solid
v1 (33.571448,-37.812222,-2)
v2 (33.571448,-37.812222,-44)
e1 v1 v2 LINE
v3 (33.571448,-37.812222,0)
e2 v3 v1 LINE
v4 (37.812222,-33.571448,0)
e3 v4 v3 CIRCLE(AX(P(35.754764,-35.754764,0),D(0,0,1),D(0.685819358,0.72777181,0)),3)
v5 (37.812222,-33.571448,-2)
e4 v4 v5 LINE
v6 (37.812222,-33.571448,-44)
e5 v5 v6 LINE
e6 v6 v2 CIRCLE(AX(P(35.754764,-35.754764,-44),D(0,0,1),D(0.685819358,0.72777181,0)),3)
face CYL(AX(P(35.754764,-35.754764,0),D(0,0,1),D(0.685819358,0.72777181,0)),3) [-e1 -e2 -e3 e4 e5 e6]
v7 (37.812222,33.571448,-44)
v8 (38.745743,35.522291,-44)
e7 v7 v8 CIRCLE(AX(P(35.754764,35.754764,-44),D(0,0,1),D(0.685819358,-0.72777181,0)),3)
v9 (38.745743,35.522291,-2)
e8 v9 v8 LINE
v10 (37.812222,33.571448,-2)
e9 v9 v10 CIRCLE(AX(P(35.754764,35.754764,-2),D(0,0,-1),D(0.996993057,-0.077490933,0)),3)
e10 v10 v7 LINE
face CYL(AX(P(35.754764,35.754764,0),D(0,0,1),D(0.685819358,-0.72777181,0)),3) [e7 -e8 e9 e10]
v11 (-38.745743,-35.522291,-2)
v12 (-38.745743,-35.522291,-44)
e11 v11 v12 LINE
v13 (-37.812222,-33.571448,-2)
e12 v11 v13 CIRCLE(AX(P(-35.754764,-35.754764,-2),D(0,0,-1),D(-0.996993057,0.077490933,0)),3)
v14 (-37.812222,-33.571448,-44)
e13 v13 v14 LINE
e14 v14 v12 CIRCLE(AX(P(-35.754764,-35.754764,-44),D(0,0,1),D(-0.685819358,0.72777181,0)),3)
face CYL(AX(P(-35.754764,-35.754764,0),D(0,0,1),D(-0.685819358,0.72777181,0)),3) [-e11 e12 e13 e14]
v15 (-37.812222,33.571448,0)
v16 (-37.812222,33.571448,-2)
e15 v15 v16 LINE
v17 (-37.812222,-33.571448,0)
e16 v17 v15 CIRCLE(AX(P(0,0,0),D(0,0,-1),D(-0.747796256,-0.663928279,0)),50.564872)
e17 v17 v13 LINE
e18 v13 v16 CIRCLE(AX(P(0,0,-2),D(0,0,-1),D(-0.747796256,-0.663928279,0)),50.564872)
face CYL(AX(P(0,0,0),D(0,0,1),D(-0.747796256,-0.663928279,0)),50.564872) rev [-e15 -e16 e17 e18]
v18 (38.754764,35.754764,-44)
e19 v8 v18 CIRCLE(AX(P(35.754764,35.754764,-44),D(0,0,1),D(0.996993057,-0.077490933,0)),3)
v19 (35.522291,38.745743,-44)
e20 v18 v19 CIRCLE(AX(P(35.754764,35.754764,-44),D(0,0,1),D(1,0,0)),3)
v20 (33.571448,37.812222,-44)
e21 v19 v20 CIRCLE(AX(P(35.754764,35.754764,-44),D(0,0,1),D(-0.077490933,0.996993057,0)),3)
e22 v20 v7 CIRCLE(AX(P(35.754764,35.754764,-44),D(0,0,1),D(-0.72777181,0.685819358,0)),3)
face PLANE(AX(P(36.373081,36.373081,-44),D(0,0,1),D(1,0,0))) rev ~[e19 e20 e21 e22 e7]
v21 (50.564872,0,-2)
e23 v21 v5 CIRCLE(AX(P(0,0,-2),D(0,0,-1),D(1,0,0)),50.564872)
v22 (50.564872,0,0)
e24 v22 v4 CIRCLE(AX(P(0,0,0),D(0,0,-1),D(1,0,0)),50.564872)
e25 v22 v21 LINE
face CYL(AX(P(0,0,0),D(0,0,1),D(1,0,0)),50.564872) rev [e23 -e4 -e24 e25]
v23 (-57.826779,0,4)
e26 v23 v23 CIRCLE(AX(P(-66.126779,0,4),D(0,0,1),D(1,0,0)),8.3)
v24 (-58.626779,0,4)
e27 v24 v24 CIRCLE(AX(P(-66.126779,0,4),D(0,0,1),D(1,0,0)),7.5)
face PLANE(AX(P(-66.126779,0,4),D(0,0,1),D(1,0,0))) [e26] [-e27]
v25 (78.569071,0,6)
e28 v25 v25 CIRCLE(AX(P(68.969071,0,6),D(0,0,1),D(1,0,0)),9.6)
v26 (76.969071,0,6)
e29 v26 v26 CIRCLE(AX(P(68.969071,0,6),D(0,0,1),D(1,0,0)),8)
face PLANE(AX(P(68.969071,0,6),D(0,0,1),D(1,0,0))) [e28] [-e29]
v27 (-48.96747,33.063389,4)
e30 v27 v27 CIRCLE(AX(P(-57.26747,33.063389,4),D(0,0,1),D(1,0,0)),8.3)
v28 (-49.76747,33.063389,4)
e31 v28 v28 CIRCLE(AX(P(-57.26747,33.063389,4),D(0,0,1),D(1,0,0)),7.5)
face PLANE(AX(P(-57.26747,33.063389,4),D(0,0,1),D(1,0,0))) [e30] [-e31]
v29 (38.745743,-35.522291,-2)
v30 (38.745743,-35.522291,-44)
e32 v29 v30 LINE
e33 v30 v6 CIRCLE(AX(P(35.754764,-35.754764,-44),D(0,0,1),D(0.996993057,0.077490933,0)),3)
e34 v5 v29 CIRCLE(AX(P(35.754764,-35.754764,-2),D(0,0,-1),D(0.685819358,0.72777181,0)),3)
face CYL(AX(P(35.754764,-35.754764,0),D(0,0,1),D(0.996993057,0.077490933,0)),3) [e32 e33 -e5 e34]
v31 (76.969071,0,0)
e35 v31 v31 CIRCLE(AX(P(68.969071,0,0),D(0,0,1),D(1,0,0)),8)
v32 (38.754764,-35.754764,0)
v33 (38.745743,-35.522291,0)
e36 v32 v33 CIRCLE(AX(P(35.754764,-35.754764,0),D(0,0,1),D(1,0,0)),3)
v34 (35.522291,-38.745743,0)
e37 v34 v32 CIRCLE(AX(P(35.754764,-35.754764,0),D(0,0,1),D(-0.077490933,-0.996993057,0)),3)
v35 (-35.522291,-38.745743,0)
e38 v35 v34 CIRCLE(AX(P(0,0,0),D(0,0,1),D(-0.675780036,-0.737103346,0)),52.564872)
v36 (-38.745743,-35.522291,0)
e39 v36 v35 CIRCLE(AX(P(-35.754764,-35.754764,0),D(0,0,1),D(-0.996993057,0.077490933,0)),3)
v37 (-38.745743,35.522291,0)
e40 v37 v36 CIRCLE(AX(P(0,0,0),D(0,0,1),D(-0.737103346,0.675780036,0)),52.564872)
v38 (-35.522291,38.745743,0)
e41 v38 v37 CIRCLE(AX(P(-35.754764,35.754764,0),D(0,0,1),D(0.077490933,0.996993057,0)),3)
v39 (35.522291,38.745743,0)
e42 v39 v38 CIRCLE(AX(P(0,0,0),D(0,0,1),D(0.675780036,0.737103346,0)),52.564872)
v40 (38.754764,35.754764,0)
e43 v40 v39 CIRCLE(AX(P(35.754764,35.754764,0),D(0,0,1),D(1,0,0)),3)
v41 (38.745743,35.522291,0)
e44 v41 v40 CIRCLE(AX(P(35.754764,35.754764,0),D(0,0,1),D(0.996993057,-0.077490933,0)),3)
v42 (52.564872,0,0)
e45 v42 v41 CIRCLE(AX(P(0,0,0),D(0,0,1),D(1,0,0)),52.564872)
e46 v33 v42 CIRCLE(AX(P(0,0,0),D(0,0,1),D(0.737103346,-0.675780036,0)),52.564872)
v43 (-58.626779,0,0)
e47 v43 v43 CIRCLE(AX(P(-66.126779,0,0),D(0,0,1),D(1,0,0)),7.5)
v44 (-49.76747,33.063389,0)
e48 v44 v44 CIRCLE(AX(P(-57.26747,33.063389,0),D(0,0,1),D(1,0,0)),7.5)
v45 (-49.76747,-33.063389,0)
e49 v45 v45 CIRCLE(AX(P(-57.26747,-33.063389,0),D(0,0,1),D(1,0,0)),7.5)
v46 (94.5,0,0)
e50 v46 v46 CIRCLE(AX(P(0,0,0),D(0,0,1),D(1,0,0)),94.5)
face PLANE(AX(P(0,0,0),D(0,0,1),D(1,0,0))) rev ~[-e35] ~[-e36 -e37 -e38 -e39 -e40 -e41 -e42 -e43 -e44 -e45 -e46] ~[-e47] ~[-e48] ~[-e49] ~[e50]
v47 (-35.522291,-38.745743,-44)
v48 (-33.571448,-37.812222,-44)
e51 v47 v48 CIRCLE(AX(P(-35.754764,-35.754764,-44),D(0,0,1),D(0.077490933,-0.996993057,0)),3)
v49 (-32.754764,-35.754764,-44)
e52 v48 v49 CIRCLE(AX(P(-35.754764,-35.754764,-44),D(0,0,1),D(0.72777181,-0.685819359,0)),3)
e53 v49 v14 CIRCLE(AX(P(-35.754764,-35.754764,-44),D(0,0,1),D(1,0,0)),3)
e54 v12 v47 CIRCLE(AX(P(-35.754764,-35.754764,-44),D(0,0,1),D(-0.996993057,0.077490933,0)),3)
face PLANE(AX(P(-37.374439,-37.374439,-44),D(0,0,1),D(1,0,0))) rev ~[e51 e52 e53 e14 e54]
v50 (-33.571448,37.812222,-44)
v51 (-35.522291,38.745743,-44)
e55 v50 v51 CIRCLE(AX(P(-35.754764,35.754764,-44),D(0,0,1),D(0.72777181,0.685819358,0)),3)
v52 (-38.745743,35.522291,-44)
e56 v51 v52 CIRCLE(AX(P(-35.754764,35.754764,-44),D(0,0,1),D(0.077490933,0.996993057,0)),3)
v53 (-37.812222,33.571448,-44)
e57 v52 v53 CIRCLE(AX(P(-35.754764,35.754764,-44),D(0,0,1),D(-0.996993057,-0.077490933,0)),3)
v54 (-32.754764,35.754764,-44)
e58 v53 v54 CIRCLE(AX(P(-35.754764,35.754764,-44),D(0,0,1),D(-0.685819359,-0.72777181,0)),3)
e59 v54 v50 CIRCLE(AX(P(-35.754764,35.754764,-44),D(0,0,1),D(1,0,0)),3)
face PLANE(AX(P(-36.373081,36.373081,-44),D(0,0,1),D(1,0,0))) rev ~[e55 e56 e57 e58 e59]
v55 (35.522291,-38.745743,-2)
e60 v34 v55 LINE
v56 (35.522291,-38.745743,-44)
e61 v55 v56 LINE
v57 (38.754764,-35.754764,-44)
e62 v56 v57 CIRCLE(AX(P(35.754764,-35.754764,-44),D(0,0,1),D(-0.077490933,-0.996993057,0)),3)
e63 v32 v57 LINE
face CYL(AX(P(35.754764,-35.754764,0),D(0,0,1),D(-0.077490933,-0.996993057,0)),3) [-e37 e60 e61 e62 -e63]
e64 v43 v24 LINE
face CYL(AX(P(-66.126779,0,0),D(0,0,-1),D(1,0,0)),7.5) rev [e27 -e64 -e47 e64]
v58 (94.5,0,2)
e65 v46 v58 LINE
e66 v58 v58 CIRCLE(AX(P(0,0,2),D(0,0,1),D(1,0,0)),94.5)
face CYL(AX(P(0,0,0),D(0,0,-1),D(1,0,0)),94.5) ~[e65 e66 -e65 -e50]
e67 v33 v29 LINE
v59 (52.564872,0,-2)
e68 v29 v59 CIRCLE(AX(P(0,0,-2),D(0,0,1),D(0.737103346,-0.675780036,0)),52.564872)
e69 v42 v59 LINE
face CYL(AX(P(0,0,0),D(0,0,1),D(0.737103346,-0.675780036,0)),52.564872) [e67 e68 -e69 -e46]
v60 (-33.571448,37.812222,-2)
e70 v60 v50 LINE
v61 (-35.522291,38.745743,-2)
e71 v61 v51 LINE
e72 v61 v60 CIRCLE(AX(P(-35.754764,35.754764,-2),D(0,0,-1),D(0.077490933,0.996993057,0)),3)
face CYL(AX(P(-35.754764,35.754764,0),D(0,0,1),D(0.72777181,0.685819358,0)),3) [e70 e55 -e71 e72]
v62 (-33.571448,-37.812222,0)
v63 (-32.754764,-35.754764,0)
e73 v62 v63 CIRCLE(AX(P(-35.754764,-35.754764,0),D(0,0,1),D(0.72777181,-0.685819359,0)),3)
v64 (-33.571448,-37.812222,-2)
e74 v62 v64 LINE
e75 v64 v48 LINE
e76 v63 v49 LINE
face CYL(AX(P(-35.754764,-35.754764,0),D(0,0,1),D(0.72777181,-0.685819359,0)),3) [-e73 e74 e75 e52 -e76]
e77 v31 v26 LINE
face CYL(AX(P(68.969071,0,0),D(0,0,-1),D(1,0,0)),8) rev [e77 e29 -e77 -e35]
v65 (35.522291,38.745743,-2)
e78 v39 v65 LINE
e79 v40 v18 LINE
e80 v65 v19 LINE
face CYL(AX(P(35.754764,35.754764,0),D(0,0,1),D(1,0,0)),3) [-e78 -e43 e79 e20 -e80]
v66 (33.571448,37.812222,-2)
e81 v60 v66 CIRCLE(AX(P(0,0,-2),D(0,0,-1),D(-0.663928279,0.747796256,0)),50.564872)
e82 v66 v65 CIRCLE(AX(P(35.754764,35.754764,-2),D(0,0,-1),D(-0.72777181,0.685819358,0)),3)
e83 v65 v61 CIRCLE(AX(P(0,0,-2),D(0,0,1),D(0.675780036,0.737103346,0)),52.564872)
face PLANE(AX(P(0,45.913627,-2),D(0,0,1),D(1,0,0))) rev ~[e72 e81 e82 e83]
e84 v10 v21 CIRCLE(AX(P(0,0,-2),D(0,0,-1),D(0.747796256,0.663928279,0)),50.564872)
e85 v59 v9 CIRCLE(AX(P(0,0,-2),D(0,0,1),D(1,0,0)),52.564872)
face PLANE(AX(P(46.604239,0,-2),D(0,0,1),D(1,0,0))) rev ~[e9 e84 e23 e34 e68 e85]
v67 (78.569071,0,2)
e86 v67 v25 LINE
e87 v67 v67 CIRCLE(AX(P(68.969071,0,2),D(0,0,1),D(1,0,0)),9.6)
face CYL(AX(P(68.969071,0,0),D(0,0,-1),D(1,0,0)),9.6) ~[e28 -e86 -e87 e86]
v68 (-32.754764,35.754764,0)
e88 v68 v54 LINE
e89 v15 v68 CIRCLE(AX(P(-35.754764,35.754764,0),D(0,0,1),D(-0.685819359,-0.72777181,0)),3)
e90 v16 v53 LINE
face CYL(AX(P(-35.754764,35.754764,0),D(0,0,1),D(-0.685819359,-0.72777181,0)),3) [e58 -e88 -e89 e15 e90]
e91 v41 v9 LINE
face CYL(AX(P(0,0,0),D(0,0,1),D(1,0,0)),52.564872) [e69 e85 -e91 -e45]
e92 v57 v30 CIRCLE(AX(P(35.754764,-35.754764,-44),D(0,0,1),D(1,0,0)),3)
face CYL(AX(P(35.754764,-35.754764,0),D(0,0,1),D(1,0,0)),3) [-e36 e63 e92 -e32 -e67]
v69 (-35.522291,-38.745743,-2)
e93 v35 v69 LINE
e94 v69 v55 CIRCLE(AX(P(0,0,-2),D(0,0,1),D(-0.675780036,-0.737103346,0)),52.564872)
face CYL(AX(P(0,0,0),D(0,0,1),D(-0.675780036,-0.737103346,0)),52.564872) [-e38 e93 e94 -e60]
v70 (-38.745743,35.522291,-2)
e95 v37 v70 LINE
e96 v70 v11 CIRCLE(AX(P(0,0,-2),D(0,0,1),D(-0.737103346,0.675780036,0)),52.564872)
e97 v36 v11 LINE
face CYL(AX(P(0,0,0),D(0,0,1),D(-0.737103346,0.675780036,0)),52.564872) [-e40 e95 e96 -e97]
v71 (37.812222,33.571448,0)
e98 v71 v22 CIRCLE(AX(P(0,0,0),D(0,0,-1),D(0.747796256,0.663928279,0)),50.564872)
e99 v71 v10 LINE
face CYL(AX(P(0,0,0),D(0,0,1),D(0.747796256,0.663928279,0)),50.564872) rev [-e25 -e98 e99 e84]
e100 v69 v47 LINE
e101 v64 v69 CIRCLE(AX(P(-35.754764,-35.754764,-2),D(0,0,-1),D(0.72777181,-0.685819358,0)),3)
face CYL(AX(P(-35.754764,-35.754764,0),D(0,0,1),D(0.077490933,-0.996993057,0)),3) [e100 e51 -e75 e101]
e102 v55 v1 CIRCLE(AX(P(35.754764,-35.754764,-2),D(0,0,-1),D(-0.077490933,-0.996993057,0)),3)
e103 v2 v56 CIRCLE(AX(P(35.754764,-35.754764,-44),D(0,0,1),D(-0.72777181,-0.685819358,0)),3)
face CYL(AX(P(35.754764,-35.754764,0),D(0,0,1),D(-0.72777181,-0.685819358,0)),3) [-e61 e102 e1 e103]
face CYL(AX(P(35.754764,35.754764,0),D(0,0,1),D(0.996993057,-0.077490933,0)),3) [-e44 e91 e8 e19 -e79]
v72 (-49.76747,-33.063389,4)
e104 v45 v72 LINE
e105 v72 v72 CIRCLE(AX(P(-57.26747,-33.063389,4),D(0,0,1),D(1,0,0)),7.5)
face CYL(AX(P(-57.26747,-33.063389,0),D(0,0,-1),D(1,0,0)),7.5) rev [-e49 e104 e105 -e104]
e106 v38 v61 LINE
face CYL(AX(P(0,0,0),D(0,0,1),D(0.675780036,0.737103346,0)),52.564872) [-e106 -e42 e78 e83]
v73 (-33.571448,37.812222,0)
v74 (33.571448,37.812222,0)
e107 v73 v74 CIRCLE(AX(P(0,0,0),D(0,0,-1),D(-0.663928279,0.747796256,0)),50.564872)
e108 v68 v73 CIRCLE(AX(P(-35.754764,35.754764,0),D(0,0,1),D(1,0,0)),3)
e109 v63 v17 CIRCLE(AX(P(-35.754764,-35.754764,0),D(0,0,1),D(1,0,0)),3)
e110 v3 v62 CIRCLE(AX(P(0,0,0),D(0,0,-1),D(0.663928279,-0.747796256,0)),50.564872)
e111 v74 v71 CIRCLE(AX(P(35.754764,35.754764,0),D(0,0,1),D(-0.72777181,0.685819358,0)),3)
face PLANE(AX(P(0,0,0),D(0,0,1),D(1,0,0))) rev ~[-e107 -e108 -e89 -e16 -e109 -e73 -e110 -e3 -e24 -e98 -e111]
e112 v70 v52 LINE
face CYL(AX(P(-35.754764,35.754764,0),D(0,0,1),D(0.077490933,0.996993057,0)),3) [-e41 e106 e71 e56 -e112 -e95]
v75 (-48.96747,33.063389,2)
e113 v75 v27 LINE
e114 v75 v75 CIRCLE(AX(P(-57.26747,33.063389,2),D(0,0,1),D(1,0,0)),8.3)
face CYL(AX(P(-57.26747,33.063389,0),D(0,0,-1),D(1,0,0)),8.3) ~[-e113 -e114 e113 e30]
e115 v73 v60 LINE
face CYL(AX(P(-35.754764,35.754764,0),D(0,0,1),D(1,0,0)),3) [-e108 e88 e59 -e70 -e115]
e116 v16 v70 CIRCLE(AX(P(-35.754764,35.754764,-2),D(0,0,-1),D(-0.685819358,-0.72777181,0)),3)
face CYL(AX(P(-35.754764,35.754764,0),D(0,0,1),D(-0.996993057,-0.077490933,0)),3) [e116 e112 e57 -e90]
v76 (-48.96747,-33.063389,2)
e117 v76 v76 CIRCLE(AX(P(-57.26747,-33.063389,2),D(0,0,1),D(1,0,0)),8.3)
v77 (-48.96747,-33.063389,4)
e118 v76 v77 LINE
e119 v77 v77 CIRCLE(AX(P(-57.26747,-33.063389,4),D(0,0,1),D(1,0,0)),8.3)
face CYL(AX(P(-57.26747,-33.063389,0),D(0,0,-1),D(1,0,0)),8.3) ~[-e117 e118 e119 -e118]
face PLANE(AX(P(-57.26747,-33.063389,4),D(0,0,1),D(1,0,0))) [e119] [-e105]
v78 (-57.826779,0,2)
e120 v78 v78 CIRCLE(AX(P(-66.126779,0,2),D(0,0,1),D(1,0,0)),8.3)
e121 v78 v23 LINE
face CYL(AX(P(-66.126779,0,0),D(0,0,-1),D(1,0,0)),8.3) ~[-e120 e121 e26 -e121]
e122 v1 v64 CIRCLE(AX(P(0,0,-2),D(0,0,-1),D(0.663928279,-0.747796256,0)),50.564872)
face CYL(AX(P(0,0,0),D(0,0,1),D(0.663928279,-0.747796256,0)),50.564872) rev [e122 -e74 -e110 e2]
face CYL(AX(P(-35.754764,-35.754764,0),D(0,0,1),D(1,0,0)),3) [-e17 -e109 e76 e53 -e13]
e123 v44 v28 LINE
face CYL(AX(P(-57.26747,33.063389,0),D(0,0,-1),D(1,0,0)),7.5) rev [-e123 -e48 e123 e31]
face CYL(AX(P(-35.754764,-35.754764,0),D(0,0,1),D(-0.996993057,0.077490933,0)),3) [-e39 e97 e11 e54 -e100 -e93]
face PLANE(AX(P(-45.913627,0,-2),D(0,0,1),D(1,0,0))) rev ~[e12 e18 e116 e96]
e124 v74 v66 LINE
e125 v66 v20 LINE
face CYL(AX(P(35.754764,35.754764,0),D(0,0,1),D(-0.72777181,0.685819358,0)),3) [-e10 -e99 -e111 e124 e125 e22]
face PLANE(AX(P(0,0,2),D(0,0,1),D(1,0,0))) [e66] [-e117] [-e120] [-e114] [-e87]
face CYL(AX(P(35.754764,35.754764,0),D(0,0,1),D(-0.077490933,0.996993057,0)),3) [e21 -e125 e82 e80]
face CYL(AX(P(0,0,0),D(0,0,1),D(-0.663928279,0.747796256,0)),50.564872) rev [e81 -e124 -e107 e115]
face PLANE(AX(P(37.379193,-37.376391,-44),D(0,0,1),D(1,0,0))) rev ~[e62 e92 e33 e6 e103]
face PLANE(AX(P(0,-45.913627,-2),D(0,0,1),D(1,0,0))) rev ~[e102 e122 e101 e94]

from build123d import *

# Parameters (mm, degrees)
F0_R     = 94.5
F0_R_2   = 8.3
F0_R_3   = 9.6
F1_DEPTH = 2
F0_R_4   = 7.5
F2_DEPTH = 4
F3_DEPTH = 2
F0_R_5   = 8
F4_DEPTH = 6
F5_DEPTH = 44


# Not quite as in the source:
# - a feature names something its author has since deleted; it is built from what else it names


with BuildPart() as f1:
    # F0 (on Top) → F1 (new body)
    with BuildSketch(Plane.XY):
        Circle(F0_R)
        with Locations((-57.2674702435, -33.0633893609)):
            Circle(F0_R_2, mode=Mode.SUBTRACT)
        with Locations((-66.1267787218, 0)):
            Circle(F0_R_2, mode=Mode.SUBTRACT)
        with Locations((-57.2674702435, 33.0633893609)):
            Circle(F0_R_2, mode=Mode.SUBTRACT)
        with BuildLine():
            ThreePointArc((38.7457430555, 35.5222910868), (48.9884210475, 19.0578165656), (52.5648720057, 0))
            ThreePointArc((52.5648720057, 0), (48.9884210475, -19.0578165656), (38.7457430555, -35.5222910868))
            ThreePointArc((38.7457430555, -35.5222910868), (38.7525078294, -35.6384400082), (38.7547638851, -35.7547638851))
            ThreePointArc((38.7547638851, -35.7547638851), (37.7922355542, -37.9567423585), (35.5222910868, -38.7457430555))
            ThreePointArc((35.5222910868, -38.7457430555), (0, -52.5648720057), (-35.5222910868, -38.7457430555))
            ThreePointArc((-35.5222910868, -38.7457430555), (-37.8760842286, -37.8760842286), (-38.7457430555, -35.5222910868))
            ThreePointArc((-38.7457430555, -35.5222910868), (-52.5648720057, 0), (-38.7457430555, 35.5222910868))
            ThreePointArc((-38.7457430555, 35.5222910868), (-37.8760842286, 37.8760842286), (-35.5222910868, 38.7457430555))
            ThreePointArc((-35.5222910868, 38.7457430555), (0, 52.5648720057), (35.5222910868, 38.7457430555))
            ThreePointArc((35.5222910868, 38.7457430555), (37.7922355542, 37.9567423585), (38.7547638851, 35.7547638851))
            ThreePointArc((38.7547638851, 35.7547638851), (38.7525078294, 35.6384400082), (38.7457430555, 35.5222910868))
        make_face(mode=Mode.SUBTRACT)
        with Locations((68.9690709114, 0)):
            Circle(F0_R_3, mode=Mode.SUBTRACT)
        with BuildLine():
            ThreePointArc((33.5714484549, 37.8122219605), (33.6334435415, 33.6334435415), (37.8122219605, 33.5714484549))
            ThreePointArc((37.8122219605, 33.5714484549), (35.7547638851, 35.7547638851), (33.5714484549, 37.8122219605))
        make_face()
        with BuildLine():
            ThreePointArc((-37.8122219605, 33.5714484549), (-38.4608914504, 34.459822342), (-38.7457430555, 35.5222910868))
            ThreePointArc((-38.7457430555, 35.5222910868), (-52.5648720057, 0), (-38.7457430555, -35.5222910868))
            ThreePointArc((-38.7457430555, -35.5222910868), (-38.4608914504, -34.459822342), (-37.8122219605, -33.5714484549))
            ThreePointArc((-37.8122219605, -33.5714484549), (-50.5648720057, 0), (-37.8122219605, 33.5714484549))
        make_face()
        with BuildLine():
            ThreePointArc((-35.5222910868, -38.7457430555), (0, -52.5648720057), (35.5222910868, -38.7457430555))
            ThreePointArc((35.5222910868, -38.7457430555), (34.459822342, -38.4608914504), (33.5714484549, -37.8122219605))
            ThreePointArc((33.5714484549, -37.8122219605), (0, -50.5648720057), (-33.5714484549, -37.8122219605))
            ThreePointArc((-33.5714484549, -37.8122219605), (-34.459822342, -38.4608914504), (-35.5222910868, -38.7457430555))
        make_face()
        with BuildLine():
            ThreePointArc((38.7457430555, -35.5222910868), (48.9884210475, -19.0578165656), (52.5648720057, 0))
            ThreePointArc((52.5648720057, 0), (48.9884210475, 19.0578165656), (38.7457430555, 35.5222910868))
            ThreePointArc((38.7457430555, 35.5222910868), (38.4608914504, 34.459822342), (37.8122219605, 33.5714484549))
            ThreePointArc((37.8122219605, 33.5714484549), (47.2693158647, 17.9560034148), (50.5648720057, 0))
            ThreePointArc((50.5648720057, 0), (47.2693158647, -17.9560034148), (37.8122219605, -33.5714484549))
            ThreePointArc((37.8122219605, -33.5714484549), (38.4608914504, -34.459822342), (38.7457430555, -35.5222910868))
        make_face()
        with BuildLine():
            ThreePointArc((33.5714484549, 37.8122219605), (34.459822342, 38.4608914504), (35.5222910868, 38.7457430555))
            ThreePointArc((35.5222910868, 38.7457430555), (0, 52.5648720057), (-35.5222910868, 38.7457430555))
            ThreePointArc((-35.5222910868, 38.7457430555), (-34.459822342, 38.4608914504), (-33.5714484549, 37.8122219605))
            ThreePointArc((-33.5714484549, 37.8122219605), (0, 50.5648720057), (33.5714484549, 37.8122219605))
        make_face()
        with BuildLine():
            ThreePointArc((33.5714484549, -37.8122219605), (35.7547638851, -35.7547638851), (37.8122219605, -33.5714484549))
            ThreePointArc((37.8122219605, -33.5714484549), (33.6334435415, -33.6334435415), (33.5714484549, -37.8122219605))
        make_face()
        with BuildLine():
            ThreePointArc((35.5222910868, -38.7457430555), (37.1689774474, -37.1689774474), (38.7457430555, -35.5222910868))
            ThreePointArc((38.7457430555, -35.5222910868), (38.4608914504, -34.459822342), (37.8122219605, -33.5714484549))
            ThreePointArc((37.8122219605, -33.5714484549), (35.7547638851, -35.7547638851), (33.5714484549, -37.8122219605))
            ThreePointArc((33.5714484549, -37.8122219605), (34.459822342, -38.4608914504), (35.5222910868, -38.7457430555))
        make_face()
        with BuildLine():
            ThreePointArc((38.7547638851, -35.7547638851), (38.7525078294, -35.6384400082), (38.7457430555, -35.5222910868))
            ThreePointArc((38.7457430555, -35.5222910868), (37.1689774474, -37.1689774474), (35.5222910868, -38.7457430555))
            ThreePointArc((35.5222910868, -38.7457430555), (37.7922355542, -37.9567423585), (38.7547638851, -35.7547638851))
        make_face()
        with BuildLine():
            ThreePointArc((50.5648720057, 0), (47.2693158647, 17.9560034148), (37.8122219605, 33.5714484549))
            ThreePointArc((37.8122219605, 33.5714484549), (33.6334435415, 33.6334435415), (33.5714484549, 37.8122219605))
            ThreePointArc((33.5714484549, 37.8122219605), (0, 50.5648720057), (-33.5714484549, 37.8122219605))
            ThreePointArc((-33.5714484549, 37.8122219605), (-32.9664000018, 36.8615731978), (-32.7547638851, 35.7547638851))
            ThreePointArc((-32.7547638851, 35.7547638851), (-34.5657252453, 33.0004605043), (-37.8122219605, 33.5714484549))
            ThreePointArc((-37.8122219605, 33.5714484549), (-50.5648720057, 0), (-37.8122219605, -33.5714484549))
            ThreePointArc((-37.8122219605, -33.5714484549), (-34.5657252453, -33.0004605043), (-32.7547638851, -35.7547638851))
            ThreePointArc((-32.7547638851, -35.7547638851), (-32.9664000018, -36.8615731978), (-33.5714484549, -37.8122219605))
            ThreePointArc((-33.5714484549, -37.8122219605), (0, -50.5648720057), (33.5714484549, -37.8122219605))
            ThreePointArc((33.5714484549, -37.8122219605), (33.6334435415, -33.6334435415), (37.8122219605, -33.5714484549))
            ThreePointArc((37.8122219605, -33.5714484549), (47.2693158647, -17.9560034148), (50.5648720057, 0))
        make_face()
        with BuildLine():
            ThreePointArc((37.8122219605, 33.5714484549), (38.4608914504, 34.459822342), (38.7457430555, 35.5222910868))
            ThreePointArc((38.7457430555, 35.5222910868), (37.1689774474, 37.1689774474), (35.5222910868, 38.7457430555))
            ThreePointArc((35.5222910868, 38.7457430555), (34.459822342, 38.4608914504), (33.5714484549, 37.8122219605))
            ThreePointArc((33.5714484549, 37.8122219605), (35.7547638851, 35.7547638851), (37.8122219605, 33.5714484549))
        make_face()
        with BuildLine():
            ThreePointArc((35.5222910868, 38.7457430555), (37.1689774474, 37.1689774474), (38.7457430555, 35.5222910868))
            ThreePointArc((38.7457430555, 35.5222910868), (38.7525078294, 35.6384400082), (38.7547638851, 35.7547638851))
            ThreePointArc((38.7547638851, 35.7547638851), (37.7922355542, 37.9567423585), (35.5222910868, 38.7457430555))
        make_face()
        with BuildLine():
            ThreePointArc((-38.7457430555, 35.5222910868), (-37.1689774474, 37.1689774474), (-35.5222910868, 38.7457430555))
            ThreePointArc((-35.5222910868, 38.7457430555), (-37.8760842286, 37.8760842286), (-38.7457430555, 35.5222910868))
        make_face()
        with BuildLine():
            ThreePointArc((-33.5714484549, 37.8122219605), (-34.459822342, 38.4608914504), (-35.5222910868, 38.7457430555))
            ThreePointArc((-35.5222910868, 38.7457430555), (-37.1689774474, 37.1689774474), (-38.7457430555, 35.5222910868))
            ThreePointArc((-38.7457430555, 35.5222910868), (-38.4608914504, 34.459822342), (-37.8122219605, 33.5714484549))
            ThreePointArc((-37.8122219605, 33.5714484549), (-35.7547638851, 35.7547638851), (-33.5714484549, 37.8122219605))
        make_face()
        with BuildLine():
            ThreePointArc((-32.7547638851, 35.7547638851), (-32.9664000018, 36.8615731978), (-33.5714484549, 37.8122219605))
            ThreePointArc((-33.5714484549, 37.8122219605), (-35.7547638851, 35.7547638851), (-37.8122219605, 33.5714484549))
            ThreePointArc((-37.8122219605, 33.5714484549), (-34.5657252453, 33.0004605043), (-32.7547638851, 35.7547638851))
        make_face()
        with BuildLine():
            ThreePointArc((-38.7457430555, -35.5222910868), (-37.8760842286, -37.8760842286), (-35.5222910868, -38.7457430555))
            ThreePointArc((-35.5222910868, -38.7457430555), (-37.1689774474, -37.1689774474), (-38.7457430555, -35.5222910868))
        make_face()
        with BuildLine():
            ThreePointArc((-38.7457430555, -35.5222910868), (-37.1689774474, -37.1689774474), (-35.5222910868, -38.7457430555))
            ThreePointArc((-35.5222910868, -38.7457430555), (-34.459822342, -38.4608914504), (-33.5714484549, -37.8122219605))
            ThreePointArc((-33.5714484549, -37.8122219605), (-35.7547638851, -35.7547638851), (-37.8122219605, -33.5714484549))
            ThreePointArc((-37.8122219605, -33.5714484549), (-38.4608914504, -34.459822342), (-38.7457430555, -35.5222910868))
        make_face()
        with BuildLine():
            ThreePointArc((-37.8122219605, -33.5714484549), (-35.7547638851, -35.7547638851), (-33.5714484549, -37.8122219605))
            ThreePointArc((-33.5714484549, -37.8122219605), (-32.9664000018, -36.8615731978), (-32.7547638851, -35.7547638851))
            ThreePointArc((-32.7547638851, -35.7547638851), (-34.5657252453, -33.0004605043), (-37.8122219605, -33.5714484549))
        make_face()
    extrude(amount=F1_DEPTH)

    # F0 (on Top) → F2 (join)
    with BuildSketch(Plane.XY):
        with Locations((-57.2674702435, 33.0633893609)):
            Circle(F0_R_2)
        with Locations((-57.2674702435, 33.0633893609)):
            Circle(F0_R_4, mode=Mode.SUBTRACT)
        with Locations((-66.1267787218, 0)):
            Circle(F0_R_2)
        with Locations((-66.1267787218, 0)):
            Circle(F0_R_4, mode=Mode.SUBTRACT)
        with Locations((-57.2674702435, -33.0633893609)):
            Circle(F0_R_2)
        with Locations((-57.2674702435, -33.0633893609)):
            Circle(F0_R_4, mode=Mode.SUBTRACT)
    extrude(amount=F2_DEPTH)

    # F0 (on Top) → F3 (join)
    with BuildSketch(Plane.XY):
        with BuildLine():
            ThreePointArc((-37.8122219605, 33.5714484549), (-38.4608914504, 34.459822342), (-38.7457430555, 35.5222910868))
            ThreePointArc((-38.7457430555, 35.5222910868), (-52.5648720057, 0), (-38.7457430555, -35.5222910868))
            ThreePointArc((-38.7457430555, -35.5222910868), (-38.4608914504, -34.459822342), (-37.8122219605, -33.5714484549))
            ThreePointArc((-37.8122219605, -33.5714484549), (-50.5648720057, 0), (-37.8122219605, 33.5714484549))
        make_face()
        with BuildLine():
            ThreePointArc((-35.5222910868, -38.7457430555), (0, -52.5648720057), (35.5222910868, -38.7457430555))
            ThreePointArc((35.5222910868, -38.7457430555), (34.459822342, -38.4608914504), (33.5714484549, -37.8122219605))
            ThreePointArc((33.5714484549, -37.8122219605), (0, -50.5648720057), (-33.5714484549, -37.8122219605))
            ThreePointArc((-33.5714484549, -37.8122219605), (-34.459822342, -38.4608914504), (-35.5222910868, -38.7457430555))
        make_face()
        with BuildLine():
            ThreePointArc((38.7457430555, -35.5222910868), (48.9884210475, -19.0578165656), (52.5648720057, 0))
            ThreePointArc((52.5648720057, 0), (48.9884210475, 19.0578165656), (38.7457430555, 35.5222910868))
            ThreePointArc((38.7457430555, 35.5222910868), (38.4608914504, 34.459822342), (37.8122219605, 33.5714484549))
            ThreePointArc((37.8122219605, 33.5714484549), (47.2693158647, 17.9560034148), (50.5648720057, 0))
            ThreePointArc((50.5648720057, 0), (47.2693158647, -17.9560034148), (37.8122219605, -33.5714484549))
            ThreePointArc((37.8122219605, -33.5714484549), (38.4608914504, -34.459822342), (38.7457430555, -35.5222910868))
        make_face()
        with BuildLine():
            ThreePointArc((33.5714484549, 37.8122219605), (34.459822342, 38.4608914504), (35.5222910868, 38.7457430555))
            ThreePointArc((35.5222910868, 38.7457430555), (0, 52.5648720057), (-35.5222910868, 38.7457430555))
            ThreePointArc((-35.5222910868, 38.7457430555), (-34.459822342, 38.4608914504), (-33.5714484549, 37.8122219605))
            ThreePointArc((-33.5714484549, 37.8122219605), (0, 50.5648720057), (33.5714484549, 37.8122219605))
        make_face()
    extrude(amount=-F3_DEPTH)

    # F0 (on Top) → F4 (join)
    with BuildSketch(Plane.XY):
        with Locations((68.9690709114, 0)):
            Circle(F0_R_3)
        with Locations((68.9690709114, 0)):
            Circle(F0_R_5, mode=Mode.SUBTRACT)
    extrude(amount=F4_DEPTH)

    # F0 (on Top) → F5 (join)
    with BuildSketch(Plane.XY):
        with BuildLine():
            ThreePointArc((37.8122219605, 33.5714484549), (38.4608914504, 34.459822342), (38.7457430555, 35.5222910868))
            ThreePointArc((38.7457430555, 35.5222910868), (37.1689774474, 37.1689774474), (35.5222910868, 38.7457430555))
            ThreePointArc((35.5222910868, 38.7457430555), (34.459822342, 38.4608914504), (33.5714484549, 37.8122219605))
            ThreePointArc((33.5714484549, 37.8122219605), (35.7547638851, 35.7547638851), (37.8122219605, 33.5714484549))
        make_face()
        with BuildLine():
            ThreePointArc((35.5222910868, 38.7457430555), (37.1689774474, 37.1689774474), (38.7457430555, 35.5222910868))
            ThreePointArc((38.7457430555, 35.5222910868), (38.7525078294, 35.6384400082), (38.7547638851, 35.7547638851))
            ThreePointArc((38.7547638851, 35.7547638851), (37.7922355542, 37.9567423585), (35.5222910868, 38.7457430555))
        make_face()
        with BuildLine():
            ThreePointArc((38.7547638851, -35.7547638851), (38.7525078294, -35.6384400082), (38.7457430555, -35.5222910868))
            ThreePointArc((38.7457430555, -35.5222910868), (37.1689774474, -37.1689774474), (35.5222910868, -38.7457430555))
            ThreePointArc((35.5222910868, -38.7457430555), (37.7922355542, -37.9567423585), (38.7547638851, -35.7547638851))
        make_face()
        with BuildLine():
            ThreePointArc((35.5222910868, -38.7457430555), (37.1689774474, -37.1689774474), (38.7457430555, -35.5222910868))
            ThreePointArc((38.7457430555, -35.5222910868), (38.4608914504, -34.459822342), (37.8122219605, -33.5714484549))
            ThreePointArc((37.8122219605, -33.5714484549), (35.7547638851, -35.7547638851), (33.5714484549, -37.8122219605))
            ThreePointArc((33.5714484549, -37.8122219605), (34.459822342, -38.4608914504), (35.5222910868, -38.7457430555))
        make_face()
        with BuildLine():
            ThreePointArc((33.5714484549, 37.8122219605), (33.6334435415, 33.6334435415), (37.8122219605, 33.5714484549))
            ThreePointArc((37.8122219605, 33.5714484549), (35.7547638851, 35.7547638851), (33.5714484549, 37.8122219605))
        make_face()
        with BuildLine():
            ThreePointArc((33.5714484549, -37.8122219605), (35.7547638851, -35.7547638851), (37.8122219605, -33.5714484549))
            ThreePointArc((37.8122219605, -33.5714484549), (33.6334435415, -33.6334435415), (33.5714484549, -37.8122219605))
        make_face()
        with BuildLine():
            ThreePointArc((-33.5714484549, 37.8122219605), (-34.459822342, 38.4608914504), (-35.5222910868, 38.7457430555))
            ThreePointArc((-35.5222910868, 38.7457430555), (-37.1689774474, 37.1689774474), (-38.7457430555, 35.5222910868))
            ThreePointArc((-38.7457430555, 35.5222910868), (-38.4608914504, 34.459822342), (-37.8122219605, 33.5714484549))
            ThreePointArc((-37.8122219605, 33.5714484549), (-35.7547638851, 35.7547638851), (-33.5714484549, 37.8122219605))
        make_face()
        with BuildLine():
            ThreePointArc((-38.7457430555, 35.5222910868), (-37.1689774474, 37.1689774474), (-35.5222910868, 38.7457430555))
            ThreePointArc((-35.5222910868, 38.7457430555), (-37.8760842286, 37.8760842286), (-38.7457430555, 35.5222910868))
        make_face()
        with BuildLine():
            ThreePointArc((-38.7457430555, -35.5222910868), (-37.8760842286, -37.8760842286), (-35.5222910868, -38.7457430555))
            ThreePointArc((-35.5222910868, -38.7457430555), (-37.1689774474, -37.1689774474), (-38.7457430555, -35.5222910868))
        make_face()
        with BuildLine():
            ThreePointArc((-38.7457430555, -35.5222910868), (-37.1689774474, -37.1689774474), (-35.5222910868, -38.7457430555))
            ThreePointArc((-35.5222910868, -38.7457430555), (-34.459822342, -38.4608914504), (-33.5714484549, -37.8122219605))
            ThreePointArc((-33.5714484549, -37.8122219605), (-35.7547638851, -35.7547638851), (-37.8122219605, -33.5714484549))
            ThreePointArc((-37.8122219605, -33.5714484549), (-38.4608914504, -34.459822342), (-38.7457430555, -35.5222910868))
        make_face()
        with BuildLine():
            ThreePointArc((-32.7547638851, 35.7547638851), (-32.9664000018, 36.8615731978), (-33.5714484549, 37.8122219605))
            ThreePointArc((-33.5714484549, 37.8122219605), (-35.7547638851, 35.7547638851), (-37.8122219605, 33.5714484549))
            ThreePointArc((-37.8122219605, 33.5714484549), (-34.5657252453, 33.0004605043), (-32.7547638851, 35.7547638851))
        make_face()
        with BuildLine():
            ThreePointArc((-37.8122219605, -33.5714484549), (-35.7547638851, -35.7547638851), (-33.5714484549, -37.8122219605))
            ThreePointArc((-33.5714484549, -37.8122219605), (-32.9664000018, -36.8615731978), (-32.7547638851, -35.7547638851))
            ThreePointArc((-32.7547638851, -35.7547638851), (-34.5657252453, -33.0004605043), (-37.8122219605, -33.5714484549))
        make_face()
    extrude(amount=-F5_DEPTH)


solid = f1.part
